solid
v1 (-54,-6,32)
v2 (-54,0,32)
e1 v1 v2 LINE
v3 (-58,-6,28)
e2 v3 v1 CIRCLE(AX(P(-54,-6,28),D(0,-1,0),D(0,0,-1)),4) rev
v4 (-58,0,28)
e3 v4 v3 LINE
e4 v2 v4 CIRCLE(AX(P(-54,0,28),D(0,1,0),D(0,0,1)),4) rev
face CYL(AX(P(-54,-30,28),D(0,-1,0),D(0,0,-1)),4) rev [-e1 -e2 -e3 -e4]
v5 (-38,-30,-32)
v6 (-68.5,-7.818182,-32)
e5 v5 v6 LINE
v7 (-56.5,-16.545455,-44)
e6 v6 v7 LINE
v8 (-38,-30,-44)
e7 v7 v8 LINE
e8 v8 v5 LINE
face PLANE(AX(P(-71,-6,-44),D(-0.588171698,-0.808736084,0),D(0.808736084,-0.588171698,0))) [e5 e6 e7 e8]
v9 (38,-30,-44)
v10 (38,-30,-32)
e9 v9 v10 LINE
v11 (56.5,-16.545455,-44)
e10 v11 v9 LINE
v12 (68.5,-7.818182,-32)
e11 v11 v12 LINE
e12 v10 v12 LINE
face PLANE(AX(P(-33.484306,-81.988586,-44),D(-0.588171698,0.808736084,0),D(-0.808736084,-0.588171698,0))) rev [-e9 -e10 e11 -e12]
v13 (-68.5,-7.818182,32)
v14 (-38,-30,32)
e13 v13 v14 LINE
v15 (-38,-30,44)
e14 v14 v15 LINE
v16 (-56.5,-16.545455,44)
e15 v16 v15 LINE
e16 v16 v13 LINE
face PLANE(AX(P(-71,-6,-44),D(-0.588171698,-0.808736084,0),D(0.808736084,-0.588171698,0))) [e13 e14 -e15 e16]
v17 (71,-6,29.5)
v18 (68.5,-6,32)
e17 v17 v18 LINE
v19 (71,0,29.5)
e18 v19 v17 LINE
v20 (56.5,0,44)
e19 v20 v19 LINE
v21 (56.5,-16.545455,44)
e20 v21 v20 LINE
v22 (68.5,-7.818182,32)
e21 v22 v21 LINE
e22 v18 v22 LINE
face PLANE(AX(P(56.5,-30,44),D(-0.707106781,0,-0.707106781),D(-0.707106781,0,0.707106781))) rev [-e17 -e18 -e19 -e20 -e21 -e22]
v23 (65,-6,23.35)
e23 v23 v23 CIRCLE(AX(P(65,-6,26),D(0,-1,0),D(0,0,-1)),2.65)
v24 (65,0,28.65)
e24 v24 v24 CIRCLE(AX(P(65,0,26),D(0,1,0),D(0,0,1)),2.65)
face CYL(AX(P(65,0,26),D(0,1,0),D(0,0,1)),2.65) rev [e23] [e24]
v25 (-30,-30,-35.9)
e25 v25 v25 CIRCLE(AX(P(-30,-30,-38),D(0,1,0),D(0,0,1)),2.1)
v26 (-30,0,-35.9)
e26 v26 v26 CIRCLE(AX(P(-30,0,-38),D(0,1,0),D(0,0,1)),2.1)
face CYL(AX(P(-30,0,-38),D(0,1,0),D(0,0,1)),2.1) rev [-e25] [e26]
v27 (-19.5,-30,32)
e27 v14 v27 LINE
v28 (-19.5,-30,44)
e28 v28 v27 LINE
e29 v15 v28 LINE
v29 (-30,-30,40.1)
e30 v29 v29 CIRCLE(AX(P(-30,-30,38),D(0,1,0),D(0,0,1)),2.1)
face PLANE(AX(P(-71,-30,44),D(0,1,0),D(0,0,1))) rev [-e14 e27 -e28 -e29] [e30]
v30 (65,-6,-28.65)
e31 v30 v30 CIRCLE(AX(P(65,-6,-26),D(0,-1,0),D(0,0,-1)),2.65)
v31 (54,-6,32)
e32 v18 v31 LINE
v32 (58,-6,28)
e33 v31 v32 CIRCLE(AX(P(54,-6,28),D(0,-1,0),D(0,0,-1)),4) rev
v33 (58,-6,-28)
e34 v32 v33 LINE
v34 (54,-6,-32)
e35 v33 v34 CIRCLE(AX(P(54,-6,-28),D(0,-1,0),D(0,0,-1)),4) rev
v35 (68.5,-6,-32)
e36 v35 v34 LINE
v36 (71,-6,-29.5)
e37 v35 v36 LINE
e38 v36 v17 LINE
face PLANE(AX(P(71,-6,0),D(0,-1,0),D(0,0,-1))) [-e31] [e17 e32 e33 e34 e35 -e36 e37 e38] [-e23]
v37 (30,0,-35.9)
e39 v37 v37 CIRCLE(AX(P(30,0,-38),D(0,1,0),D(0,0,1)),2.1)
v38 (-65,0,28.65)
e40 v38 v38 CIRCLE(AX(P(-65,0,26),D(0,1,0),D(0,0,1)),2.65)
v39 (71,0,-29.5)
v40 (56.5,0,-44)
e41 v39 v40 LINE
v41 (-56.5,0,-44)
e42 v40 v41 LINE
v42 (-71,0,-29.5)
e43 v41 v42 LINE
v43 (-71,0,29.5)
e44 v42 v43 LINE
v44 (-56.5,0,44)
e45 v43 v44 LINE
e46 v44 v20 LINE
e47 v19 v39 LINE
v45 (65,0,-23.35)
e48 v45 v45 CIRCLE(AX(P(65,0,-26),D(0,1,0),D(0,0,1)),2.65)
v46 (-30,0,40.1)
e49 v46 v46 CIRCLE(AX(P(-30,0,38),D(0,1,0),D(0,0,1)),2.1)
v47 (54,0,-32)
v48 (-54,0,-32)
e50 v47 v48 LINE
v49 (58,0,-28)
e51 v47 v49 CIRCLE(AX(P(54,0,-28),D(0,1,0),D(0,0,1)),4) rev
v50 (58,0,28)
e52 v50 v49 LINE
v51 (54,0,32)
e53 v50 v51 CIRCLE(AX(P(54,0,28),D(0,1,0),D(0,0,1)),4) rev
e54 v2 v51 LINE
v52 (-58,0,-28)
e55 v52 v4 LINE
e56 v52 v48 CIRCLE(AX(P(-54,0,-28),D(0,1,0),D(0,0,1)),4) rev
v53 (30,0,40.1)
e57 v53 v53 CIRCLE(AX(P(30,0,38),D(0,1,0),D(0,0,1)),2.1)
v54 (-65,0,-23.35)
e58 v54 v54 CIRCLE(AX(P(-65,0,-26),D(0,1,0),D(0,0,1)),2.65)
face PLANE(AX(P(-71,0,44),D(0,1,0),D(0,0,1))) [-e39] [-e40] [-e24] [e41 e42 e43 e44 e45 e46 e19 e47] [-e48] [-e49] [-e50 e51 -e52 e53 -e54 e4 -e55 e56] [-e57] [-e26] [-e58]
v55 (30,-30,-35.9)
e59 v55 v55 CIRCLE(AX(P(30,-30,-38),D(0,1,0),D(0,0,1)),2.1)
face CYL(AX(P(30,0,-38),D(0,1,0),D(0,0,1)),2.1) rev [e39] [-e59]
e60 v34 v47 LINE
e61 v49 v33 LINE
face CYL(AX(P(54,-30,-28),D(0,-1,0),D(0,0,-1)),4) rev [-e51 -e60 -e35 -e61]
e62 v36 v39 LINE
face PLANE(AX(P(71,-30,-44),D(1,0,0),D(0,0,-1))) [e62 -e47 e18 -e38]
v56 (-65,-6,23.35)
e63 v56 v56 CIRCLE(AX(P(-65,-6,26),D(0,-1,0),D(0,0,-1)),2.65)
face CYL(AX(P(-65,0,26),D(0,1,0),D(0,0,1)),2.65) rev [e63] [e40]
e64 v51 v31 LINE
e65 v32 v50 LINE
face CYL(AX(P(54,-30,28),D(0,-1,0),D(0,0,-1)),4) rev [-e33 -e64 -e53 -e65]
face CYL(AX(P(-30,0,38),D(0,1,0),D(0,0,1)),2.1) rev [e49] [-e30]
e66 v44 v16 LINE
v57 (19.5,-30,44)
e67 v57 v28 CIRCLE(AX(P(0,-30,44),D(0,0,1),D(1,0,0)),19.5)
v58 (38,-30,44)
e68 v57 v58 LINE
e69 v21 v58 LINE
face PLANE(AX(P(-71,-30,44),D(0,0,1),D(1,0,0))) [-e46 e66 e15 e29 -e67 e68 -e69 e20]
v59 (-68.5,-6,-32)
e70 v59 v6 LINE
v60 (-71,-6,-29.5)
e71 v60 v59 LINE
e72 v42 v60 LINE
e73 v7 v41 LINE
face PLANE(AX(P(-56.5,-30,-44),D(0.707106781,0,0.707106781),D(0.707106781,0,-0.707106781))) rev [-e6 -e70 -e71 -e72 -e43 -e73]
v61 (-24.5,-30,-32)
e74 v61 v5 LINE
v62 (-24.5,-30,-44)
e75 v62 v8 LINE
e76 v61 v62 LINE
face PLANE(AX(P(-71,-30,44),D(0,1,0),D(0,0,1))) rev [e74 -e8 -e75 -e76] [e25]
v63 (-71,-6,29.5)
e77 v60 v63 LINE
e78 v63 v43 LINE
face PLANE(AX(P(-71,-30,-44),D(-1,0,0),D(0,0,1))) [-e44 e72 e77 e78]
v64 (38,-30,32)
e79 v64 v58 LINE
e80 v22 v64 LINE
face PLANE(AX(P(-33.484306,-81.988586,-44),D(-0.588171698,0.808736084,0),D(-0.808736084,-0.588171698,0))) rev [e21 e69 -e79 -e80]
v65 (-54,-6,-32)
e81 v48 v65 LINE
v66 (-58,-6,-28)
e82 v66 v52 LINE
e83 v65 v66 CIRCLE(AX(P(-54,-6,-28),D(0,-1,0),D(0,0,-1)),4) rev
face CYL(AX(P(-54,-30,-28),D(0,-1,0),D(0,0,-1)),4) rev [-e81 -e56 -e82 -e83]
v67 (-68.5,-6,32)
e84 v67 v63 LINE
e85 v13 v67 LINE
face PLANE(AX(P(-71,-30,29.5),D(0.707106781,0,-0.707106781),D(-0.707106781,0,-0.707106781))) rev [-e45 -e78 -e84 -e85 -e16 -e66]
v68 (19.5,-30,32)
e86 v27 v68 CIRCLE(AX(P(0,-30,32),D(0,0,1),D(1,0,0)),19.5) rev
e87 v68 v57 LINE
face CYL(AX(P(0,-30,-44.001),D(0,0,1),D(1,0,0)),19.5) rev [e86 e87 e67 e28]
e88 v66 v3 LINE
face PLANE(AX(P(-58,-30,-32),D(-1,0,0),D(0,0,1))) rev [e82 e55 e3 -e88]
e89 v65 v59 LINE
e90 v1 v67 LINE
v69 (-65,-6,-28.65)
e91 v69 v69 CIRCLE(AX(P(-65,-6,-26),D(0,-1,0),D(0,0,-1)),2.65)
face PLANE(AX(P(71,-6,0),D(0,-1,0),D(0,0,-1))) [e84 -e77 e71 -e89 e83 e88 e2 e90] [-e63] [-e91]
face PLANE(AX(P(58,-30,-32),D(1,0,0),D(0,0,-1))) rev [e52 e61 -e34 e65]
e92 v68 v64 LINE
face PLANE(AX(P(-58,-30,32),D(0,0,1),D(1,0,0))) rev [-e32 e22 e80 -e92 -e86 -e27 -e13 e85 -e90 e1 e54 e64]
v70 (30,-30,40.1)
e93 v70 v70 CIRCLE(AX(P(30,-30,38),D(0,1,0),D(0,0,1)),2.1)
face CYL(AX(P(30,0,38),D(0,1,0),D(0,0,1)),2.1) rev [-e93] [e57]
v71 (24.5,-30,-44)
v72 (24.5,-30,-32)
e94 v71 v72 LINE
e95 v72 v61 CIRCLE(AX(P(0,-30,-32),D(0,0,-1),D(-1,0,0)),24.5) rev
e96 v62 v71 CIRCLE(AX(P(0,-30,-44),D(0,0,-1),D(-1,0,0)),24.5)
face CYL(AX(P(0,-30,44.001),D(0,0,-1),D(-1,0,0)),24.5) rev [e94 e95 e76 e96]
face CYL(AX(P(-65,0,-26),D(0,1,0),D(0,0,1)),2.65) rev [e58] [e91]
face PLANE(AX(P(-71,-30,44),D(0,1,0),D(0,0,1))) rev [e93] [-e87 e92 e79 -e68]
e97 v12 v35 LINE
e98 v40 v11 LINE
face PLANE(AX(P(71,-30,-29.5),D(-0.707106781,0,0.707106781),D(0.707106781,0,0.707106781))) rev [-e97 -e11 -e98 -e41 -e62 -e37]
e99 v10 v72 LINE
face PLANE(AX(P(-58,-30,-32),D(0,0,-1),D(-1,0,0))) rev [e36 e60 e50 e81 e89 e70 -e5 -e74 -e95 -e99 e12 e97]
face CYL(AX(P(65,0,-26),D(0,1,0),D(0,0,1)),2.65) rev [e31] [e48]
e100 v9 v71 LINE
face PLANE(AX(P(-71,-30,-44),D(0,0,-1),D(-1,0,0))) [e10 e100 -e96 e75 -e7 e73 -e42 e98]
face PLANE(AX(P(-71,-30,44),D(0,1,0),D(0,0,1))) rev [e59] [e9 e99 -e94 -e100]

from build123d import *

# Parameters (mm, degrees)
SKETCH_1_W          = 142
SKETCH_1_H          = 88
SKETCH_1_W_2        = 116
SKETCH_1_H_2        = 64
EXTRUDE_1_DEPTH     = 30
CUT_EXTRUDE_1_DEPTH = 117.982904734
SKETCH_4_W          = 64
SKETCH_4_H          = 16.727272727
CUT_EXTRUDE_2_DEPTH = 152.657508881
FILLET_3_R          = 4
CHAMFER_2_SIZE      = 14.5
CUT_EXTRUDE_4_REACH = 118.983
SKETCH_8_R          = 19.5
CUT_EXTRUDE_5_REACH = 118.983
SKETCH_9_R          = 24.5
F_4_X_M5_D          = 4.2
F_4_X_M5_2_D        = 5.3


with BuildPart() as part:
    # 草图1 → 凸台-拉伸1 (new body)
    with BuildSketch(Plane(origin=(0, 0, 0), x_dir=(1, 0, 0), z_dir=(0, 1, 0))):
        Rectangle(SKETCH_1_W, SKETCH_1_H)
        Rectangle(SKETCH_1_W_2, SKETCH_1_H_2, mode=Mode.SUBTRACT)
    extrude(amount=-EXTRUDE_1_DEPTH)

    # 草图2 → 切除-拉伸1 (cut, through all)
    with BuildSketch(Plane.XY.offset(44)):
        Polygon((71, -6), (38, -30), (71, -30), align=None)
        Polygon((-71, -30), (-71, -6), (-38, -30), align=None)
    extrude(amount=-CUT_EXTRUDE_1_DEPTH, mode=Mode.SUBTRACT)

    # 草图4 → 切除-拉伸2 (cut, through all)
    with BuildSketch(Plane.ZY.offset(71)):
        with Locations((0, -14.363636364)):
            Rectangle(SKETCH_4_W, SKETCH_4_H)
    extrude(amount=-CUT_EXTRUDE_2_DEPTH, mode=Mode.SUBTRACT)

    # 圆角3
    fillet_3_edges = [part.edges().sort_by_distance(p)[0] for p in [
        (58, -3, -32),
        (58, -3, 32),
        (-58, -3, 32),
        (-58, -3, -32),
    ]]
    fillet(fillet_3_edges, radius=FILLET_3_R)

    # 倒角2
    # the kernel refuses this chamfer: 14.5 mm, written as the material it takes off along each edge
    with BuildSketch(Plane(origin=(71, 37.289403326, 44), x_dir=(-0.9996219169112966, 0, 0.027495876610586445), z_dir=(0, -1, 0)), Plane(origin=(-71, 37.289403326, 44), x_dir=(-0.02749587661058598, 0, -0.9996219169112966), z_dir=(0, -1, 0)), Plane(origin=(-71, 37.289403326, -44), x_dir=(0.9996219169112966, 0, -0.027495876610586455), z_dir=(0, -1, 0))) as chamfer_2_piece_1:
        Polygon((CHAMFER_2_SIZE * 0.999621916911, CHAMFER_2_SIZE * 0.0274958766106), (-CHAMFER_2_SIZE * 0.0274958766106, CHAMFER_2_SIZE * 0.999621916911), (0, 0), align=None)
    extrude(amount=80.578806651, mode=Mode.SUBTRACT)
    with BuildSketch(Plane(origin=(71, 37.289403326, -44), x_dir=(-0.9996219169112966, 0, -0.027495876610586455), z_dir=(0, -1, 0))) as chamfer_2_piece_2:
        Polygon((CHAMFER_2_SIZE * 0.999621916911, -CHAMFER_2_SIZE * 0.0274958766106), (-CHAMFER_2_SIZE * 0.0274958766106, -CHAMFER_2_SIZE * 0.999621916911), (0, 0), align=None)
    extrude(amount=80.578806651, mode=Mode.SUBTRACT)

    # 草图8 → 切除-拉伸4 (cut, up to next)
    with BuildSketch(Plane.XY.offset(44), mode=Mode.PRIVATE) as cut_extrude_4_sk1:
        with Locations((0, -30)):
            Circle(SKETCH_8_R)
    cut_extrude_4_tool1 = extrude(cut_extrude_4_sk1.sketch, amount=-CUT_EXTRUDE_4_REACH, mode=Mode.PRIVATE) & part.part
    add(cut_extrude_4_tool1.solids().sort_by_distance((0, -30, 44))[0], mode=Mode.SUBTRACT)

    # 草图9 → 切除-拉伸5 (cut, up to next)
    with BuildSketch(Plane(origin=(0, 0, -44), x_dir=(-1, 0, 0), z_dir=(0, 0, -1)), mode=Mode.PRIVATE) as cut_extrude_5_sk1:
        with Locations((0, -30)):
            Circle(SKETCH_9_R)
    cut_extrude_5_tool1 = extrude(cut_extrude_5_sk1.sketch, amount=-CUT_EXTRUDE_5_REACH, mode=Mode.PRIVATE) & part.part
    add(cut_extrude_5_tool1.solids().sort_by_distance((0, -30, -44))[0], mode=Mode.SUBTRACT)

    # 4 x M5 (through all)
    with Locations(Plane(origin=(0, 0, 0), x_dir=(-1, 0, 0), z_dir=(0, 1, 0))):
        with Locations((30, -38), (-30, -38), (-30, 38), (30, 38)):
            Hole(F_4_X_M5_D / 2)

    # 4 x M5 2 (through all)
    with Locations(Plane(origin=(0, 0, 0), x_dir=(-1, 0, 0), z_dir=(0, 1, 0))):
        with Locations((65, -26), (-65, -26), (65, 26), (-65, 26)):
            Hole(F_4_X_M5_2_D / 2)


solid = part.part
